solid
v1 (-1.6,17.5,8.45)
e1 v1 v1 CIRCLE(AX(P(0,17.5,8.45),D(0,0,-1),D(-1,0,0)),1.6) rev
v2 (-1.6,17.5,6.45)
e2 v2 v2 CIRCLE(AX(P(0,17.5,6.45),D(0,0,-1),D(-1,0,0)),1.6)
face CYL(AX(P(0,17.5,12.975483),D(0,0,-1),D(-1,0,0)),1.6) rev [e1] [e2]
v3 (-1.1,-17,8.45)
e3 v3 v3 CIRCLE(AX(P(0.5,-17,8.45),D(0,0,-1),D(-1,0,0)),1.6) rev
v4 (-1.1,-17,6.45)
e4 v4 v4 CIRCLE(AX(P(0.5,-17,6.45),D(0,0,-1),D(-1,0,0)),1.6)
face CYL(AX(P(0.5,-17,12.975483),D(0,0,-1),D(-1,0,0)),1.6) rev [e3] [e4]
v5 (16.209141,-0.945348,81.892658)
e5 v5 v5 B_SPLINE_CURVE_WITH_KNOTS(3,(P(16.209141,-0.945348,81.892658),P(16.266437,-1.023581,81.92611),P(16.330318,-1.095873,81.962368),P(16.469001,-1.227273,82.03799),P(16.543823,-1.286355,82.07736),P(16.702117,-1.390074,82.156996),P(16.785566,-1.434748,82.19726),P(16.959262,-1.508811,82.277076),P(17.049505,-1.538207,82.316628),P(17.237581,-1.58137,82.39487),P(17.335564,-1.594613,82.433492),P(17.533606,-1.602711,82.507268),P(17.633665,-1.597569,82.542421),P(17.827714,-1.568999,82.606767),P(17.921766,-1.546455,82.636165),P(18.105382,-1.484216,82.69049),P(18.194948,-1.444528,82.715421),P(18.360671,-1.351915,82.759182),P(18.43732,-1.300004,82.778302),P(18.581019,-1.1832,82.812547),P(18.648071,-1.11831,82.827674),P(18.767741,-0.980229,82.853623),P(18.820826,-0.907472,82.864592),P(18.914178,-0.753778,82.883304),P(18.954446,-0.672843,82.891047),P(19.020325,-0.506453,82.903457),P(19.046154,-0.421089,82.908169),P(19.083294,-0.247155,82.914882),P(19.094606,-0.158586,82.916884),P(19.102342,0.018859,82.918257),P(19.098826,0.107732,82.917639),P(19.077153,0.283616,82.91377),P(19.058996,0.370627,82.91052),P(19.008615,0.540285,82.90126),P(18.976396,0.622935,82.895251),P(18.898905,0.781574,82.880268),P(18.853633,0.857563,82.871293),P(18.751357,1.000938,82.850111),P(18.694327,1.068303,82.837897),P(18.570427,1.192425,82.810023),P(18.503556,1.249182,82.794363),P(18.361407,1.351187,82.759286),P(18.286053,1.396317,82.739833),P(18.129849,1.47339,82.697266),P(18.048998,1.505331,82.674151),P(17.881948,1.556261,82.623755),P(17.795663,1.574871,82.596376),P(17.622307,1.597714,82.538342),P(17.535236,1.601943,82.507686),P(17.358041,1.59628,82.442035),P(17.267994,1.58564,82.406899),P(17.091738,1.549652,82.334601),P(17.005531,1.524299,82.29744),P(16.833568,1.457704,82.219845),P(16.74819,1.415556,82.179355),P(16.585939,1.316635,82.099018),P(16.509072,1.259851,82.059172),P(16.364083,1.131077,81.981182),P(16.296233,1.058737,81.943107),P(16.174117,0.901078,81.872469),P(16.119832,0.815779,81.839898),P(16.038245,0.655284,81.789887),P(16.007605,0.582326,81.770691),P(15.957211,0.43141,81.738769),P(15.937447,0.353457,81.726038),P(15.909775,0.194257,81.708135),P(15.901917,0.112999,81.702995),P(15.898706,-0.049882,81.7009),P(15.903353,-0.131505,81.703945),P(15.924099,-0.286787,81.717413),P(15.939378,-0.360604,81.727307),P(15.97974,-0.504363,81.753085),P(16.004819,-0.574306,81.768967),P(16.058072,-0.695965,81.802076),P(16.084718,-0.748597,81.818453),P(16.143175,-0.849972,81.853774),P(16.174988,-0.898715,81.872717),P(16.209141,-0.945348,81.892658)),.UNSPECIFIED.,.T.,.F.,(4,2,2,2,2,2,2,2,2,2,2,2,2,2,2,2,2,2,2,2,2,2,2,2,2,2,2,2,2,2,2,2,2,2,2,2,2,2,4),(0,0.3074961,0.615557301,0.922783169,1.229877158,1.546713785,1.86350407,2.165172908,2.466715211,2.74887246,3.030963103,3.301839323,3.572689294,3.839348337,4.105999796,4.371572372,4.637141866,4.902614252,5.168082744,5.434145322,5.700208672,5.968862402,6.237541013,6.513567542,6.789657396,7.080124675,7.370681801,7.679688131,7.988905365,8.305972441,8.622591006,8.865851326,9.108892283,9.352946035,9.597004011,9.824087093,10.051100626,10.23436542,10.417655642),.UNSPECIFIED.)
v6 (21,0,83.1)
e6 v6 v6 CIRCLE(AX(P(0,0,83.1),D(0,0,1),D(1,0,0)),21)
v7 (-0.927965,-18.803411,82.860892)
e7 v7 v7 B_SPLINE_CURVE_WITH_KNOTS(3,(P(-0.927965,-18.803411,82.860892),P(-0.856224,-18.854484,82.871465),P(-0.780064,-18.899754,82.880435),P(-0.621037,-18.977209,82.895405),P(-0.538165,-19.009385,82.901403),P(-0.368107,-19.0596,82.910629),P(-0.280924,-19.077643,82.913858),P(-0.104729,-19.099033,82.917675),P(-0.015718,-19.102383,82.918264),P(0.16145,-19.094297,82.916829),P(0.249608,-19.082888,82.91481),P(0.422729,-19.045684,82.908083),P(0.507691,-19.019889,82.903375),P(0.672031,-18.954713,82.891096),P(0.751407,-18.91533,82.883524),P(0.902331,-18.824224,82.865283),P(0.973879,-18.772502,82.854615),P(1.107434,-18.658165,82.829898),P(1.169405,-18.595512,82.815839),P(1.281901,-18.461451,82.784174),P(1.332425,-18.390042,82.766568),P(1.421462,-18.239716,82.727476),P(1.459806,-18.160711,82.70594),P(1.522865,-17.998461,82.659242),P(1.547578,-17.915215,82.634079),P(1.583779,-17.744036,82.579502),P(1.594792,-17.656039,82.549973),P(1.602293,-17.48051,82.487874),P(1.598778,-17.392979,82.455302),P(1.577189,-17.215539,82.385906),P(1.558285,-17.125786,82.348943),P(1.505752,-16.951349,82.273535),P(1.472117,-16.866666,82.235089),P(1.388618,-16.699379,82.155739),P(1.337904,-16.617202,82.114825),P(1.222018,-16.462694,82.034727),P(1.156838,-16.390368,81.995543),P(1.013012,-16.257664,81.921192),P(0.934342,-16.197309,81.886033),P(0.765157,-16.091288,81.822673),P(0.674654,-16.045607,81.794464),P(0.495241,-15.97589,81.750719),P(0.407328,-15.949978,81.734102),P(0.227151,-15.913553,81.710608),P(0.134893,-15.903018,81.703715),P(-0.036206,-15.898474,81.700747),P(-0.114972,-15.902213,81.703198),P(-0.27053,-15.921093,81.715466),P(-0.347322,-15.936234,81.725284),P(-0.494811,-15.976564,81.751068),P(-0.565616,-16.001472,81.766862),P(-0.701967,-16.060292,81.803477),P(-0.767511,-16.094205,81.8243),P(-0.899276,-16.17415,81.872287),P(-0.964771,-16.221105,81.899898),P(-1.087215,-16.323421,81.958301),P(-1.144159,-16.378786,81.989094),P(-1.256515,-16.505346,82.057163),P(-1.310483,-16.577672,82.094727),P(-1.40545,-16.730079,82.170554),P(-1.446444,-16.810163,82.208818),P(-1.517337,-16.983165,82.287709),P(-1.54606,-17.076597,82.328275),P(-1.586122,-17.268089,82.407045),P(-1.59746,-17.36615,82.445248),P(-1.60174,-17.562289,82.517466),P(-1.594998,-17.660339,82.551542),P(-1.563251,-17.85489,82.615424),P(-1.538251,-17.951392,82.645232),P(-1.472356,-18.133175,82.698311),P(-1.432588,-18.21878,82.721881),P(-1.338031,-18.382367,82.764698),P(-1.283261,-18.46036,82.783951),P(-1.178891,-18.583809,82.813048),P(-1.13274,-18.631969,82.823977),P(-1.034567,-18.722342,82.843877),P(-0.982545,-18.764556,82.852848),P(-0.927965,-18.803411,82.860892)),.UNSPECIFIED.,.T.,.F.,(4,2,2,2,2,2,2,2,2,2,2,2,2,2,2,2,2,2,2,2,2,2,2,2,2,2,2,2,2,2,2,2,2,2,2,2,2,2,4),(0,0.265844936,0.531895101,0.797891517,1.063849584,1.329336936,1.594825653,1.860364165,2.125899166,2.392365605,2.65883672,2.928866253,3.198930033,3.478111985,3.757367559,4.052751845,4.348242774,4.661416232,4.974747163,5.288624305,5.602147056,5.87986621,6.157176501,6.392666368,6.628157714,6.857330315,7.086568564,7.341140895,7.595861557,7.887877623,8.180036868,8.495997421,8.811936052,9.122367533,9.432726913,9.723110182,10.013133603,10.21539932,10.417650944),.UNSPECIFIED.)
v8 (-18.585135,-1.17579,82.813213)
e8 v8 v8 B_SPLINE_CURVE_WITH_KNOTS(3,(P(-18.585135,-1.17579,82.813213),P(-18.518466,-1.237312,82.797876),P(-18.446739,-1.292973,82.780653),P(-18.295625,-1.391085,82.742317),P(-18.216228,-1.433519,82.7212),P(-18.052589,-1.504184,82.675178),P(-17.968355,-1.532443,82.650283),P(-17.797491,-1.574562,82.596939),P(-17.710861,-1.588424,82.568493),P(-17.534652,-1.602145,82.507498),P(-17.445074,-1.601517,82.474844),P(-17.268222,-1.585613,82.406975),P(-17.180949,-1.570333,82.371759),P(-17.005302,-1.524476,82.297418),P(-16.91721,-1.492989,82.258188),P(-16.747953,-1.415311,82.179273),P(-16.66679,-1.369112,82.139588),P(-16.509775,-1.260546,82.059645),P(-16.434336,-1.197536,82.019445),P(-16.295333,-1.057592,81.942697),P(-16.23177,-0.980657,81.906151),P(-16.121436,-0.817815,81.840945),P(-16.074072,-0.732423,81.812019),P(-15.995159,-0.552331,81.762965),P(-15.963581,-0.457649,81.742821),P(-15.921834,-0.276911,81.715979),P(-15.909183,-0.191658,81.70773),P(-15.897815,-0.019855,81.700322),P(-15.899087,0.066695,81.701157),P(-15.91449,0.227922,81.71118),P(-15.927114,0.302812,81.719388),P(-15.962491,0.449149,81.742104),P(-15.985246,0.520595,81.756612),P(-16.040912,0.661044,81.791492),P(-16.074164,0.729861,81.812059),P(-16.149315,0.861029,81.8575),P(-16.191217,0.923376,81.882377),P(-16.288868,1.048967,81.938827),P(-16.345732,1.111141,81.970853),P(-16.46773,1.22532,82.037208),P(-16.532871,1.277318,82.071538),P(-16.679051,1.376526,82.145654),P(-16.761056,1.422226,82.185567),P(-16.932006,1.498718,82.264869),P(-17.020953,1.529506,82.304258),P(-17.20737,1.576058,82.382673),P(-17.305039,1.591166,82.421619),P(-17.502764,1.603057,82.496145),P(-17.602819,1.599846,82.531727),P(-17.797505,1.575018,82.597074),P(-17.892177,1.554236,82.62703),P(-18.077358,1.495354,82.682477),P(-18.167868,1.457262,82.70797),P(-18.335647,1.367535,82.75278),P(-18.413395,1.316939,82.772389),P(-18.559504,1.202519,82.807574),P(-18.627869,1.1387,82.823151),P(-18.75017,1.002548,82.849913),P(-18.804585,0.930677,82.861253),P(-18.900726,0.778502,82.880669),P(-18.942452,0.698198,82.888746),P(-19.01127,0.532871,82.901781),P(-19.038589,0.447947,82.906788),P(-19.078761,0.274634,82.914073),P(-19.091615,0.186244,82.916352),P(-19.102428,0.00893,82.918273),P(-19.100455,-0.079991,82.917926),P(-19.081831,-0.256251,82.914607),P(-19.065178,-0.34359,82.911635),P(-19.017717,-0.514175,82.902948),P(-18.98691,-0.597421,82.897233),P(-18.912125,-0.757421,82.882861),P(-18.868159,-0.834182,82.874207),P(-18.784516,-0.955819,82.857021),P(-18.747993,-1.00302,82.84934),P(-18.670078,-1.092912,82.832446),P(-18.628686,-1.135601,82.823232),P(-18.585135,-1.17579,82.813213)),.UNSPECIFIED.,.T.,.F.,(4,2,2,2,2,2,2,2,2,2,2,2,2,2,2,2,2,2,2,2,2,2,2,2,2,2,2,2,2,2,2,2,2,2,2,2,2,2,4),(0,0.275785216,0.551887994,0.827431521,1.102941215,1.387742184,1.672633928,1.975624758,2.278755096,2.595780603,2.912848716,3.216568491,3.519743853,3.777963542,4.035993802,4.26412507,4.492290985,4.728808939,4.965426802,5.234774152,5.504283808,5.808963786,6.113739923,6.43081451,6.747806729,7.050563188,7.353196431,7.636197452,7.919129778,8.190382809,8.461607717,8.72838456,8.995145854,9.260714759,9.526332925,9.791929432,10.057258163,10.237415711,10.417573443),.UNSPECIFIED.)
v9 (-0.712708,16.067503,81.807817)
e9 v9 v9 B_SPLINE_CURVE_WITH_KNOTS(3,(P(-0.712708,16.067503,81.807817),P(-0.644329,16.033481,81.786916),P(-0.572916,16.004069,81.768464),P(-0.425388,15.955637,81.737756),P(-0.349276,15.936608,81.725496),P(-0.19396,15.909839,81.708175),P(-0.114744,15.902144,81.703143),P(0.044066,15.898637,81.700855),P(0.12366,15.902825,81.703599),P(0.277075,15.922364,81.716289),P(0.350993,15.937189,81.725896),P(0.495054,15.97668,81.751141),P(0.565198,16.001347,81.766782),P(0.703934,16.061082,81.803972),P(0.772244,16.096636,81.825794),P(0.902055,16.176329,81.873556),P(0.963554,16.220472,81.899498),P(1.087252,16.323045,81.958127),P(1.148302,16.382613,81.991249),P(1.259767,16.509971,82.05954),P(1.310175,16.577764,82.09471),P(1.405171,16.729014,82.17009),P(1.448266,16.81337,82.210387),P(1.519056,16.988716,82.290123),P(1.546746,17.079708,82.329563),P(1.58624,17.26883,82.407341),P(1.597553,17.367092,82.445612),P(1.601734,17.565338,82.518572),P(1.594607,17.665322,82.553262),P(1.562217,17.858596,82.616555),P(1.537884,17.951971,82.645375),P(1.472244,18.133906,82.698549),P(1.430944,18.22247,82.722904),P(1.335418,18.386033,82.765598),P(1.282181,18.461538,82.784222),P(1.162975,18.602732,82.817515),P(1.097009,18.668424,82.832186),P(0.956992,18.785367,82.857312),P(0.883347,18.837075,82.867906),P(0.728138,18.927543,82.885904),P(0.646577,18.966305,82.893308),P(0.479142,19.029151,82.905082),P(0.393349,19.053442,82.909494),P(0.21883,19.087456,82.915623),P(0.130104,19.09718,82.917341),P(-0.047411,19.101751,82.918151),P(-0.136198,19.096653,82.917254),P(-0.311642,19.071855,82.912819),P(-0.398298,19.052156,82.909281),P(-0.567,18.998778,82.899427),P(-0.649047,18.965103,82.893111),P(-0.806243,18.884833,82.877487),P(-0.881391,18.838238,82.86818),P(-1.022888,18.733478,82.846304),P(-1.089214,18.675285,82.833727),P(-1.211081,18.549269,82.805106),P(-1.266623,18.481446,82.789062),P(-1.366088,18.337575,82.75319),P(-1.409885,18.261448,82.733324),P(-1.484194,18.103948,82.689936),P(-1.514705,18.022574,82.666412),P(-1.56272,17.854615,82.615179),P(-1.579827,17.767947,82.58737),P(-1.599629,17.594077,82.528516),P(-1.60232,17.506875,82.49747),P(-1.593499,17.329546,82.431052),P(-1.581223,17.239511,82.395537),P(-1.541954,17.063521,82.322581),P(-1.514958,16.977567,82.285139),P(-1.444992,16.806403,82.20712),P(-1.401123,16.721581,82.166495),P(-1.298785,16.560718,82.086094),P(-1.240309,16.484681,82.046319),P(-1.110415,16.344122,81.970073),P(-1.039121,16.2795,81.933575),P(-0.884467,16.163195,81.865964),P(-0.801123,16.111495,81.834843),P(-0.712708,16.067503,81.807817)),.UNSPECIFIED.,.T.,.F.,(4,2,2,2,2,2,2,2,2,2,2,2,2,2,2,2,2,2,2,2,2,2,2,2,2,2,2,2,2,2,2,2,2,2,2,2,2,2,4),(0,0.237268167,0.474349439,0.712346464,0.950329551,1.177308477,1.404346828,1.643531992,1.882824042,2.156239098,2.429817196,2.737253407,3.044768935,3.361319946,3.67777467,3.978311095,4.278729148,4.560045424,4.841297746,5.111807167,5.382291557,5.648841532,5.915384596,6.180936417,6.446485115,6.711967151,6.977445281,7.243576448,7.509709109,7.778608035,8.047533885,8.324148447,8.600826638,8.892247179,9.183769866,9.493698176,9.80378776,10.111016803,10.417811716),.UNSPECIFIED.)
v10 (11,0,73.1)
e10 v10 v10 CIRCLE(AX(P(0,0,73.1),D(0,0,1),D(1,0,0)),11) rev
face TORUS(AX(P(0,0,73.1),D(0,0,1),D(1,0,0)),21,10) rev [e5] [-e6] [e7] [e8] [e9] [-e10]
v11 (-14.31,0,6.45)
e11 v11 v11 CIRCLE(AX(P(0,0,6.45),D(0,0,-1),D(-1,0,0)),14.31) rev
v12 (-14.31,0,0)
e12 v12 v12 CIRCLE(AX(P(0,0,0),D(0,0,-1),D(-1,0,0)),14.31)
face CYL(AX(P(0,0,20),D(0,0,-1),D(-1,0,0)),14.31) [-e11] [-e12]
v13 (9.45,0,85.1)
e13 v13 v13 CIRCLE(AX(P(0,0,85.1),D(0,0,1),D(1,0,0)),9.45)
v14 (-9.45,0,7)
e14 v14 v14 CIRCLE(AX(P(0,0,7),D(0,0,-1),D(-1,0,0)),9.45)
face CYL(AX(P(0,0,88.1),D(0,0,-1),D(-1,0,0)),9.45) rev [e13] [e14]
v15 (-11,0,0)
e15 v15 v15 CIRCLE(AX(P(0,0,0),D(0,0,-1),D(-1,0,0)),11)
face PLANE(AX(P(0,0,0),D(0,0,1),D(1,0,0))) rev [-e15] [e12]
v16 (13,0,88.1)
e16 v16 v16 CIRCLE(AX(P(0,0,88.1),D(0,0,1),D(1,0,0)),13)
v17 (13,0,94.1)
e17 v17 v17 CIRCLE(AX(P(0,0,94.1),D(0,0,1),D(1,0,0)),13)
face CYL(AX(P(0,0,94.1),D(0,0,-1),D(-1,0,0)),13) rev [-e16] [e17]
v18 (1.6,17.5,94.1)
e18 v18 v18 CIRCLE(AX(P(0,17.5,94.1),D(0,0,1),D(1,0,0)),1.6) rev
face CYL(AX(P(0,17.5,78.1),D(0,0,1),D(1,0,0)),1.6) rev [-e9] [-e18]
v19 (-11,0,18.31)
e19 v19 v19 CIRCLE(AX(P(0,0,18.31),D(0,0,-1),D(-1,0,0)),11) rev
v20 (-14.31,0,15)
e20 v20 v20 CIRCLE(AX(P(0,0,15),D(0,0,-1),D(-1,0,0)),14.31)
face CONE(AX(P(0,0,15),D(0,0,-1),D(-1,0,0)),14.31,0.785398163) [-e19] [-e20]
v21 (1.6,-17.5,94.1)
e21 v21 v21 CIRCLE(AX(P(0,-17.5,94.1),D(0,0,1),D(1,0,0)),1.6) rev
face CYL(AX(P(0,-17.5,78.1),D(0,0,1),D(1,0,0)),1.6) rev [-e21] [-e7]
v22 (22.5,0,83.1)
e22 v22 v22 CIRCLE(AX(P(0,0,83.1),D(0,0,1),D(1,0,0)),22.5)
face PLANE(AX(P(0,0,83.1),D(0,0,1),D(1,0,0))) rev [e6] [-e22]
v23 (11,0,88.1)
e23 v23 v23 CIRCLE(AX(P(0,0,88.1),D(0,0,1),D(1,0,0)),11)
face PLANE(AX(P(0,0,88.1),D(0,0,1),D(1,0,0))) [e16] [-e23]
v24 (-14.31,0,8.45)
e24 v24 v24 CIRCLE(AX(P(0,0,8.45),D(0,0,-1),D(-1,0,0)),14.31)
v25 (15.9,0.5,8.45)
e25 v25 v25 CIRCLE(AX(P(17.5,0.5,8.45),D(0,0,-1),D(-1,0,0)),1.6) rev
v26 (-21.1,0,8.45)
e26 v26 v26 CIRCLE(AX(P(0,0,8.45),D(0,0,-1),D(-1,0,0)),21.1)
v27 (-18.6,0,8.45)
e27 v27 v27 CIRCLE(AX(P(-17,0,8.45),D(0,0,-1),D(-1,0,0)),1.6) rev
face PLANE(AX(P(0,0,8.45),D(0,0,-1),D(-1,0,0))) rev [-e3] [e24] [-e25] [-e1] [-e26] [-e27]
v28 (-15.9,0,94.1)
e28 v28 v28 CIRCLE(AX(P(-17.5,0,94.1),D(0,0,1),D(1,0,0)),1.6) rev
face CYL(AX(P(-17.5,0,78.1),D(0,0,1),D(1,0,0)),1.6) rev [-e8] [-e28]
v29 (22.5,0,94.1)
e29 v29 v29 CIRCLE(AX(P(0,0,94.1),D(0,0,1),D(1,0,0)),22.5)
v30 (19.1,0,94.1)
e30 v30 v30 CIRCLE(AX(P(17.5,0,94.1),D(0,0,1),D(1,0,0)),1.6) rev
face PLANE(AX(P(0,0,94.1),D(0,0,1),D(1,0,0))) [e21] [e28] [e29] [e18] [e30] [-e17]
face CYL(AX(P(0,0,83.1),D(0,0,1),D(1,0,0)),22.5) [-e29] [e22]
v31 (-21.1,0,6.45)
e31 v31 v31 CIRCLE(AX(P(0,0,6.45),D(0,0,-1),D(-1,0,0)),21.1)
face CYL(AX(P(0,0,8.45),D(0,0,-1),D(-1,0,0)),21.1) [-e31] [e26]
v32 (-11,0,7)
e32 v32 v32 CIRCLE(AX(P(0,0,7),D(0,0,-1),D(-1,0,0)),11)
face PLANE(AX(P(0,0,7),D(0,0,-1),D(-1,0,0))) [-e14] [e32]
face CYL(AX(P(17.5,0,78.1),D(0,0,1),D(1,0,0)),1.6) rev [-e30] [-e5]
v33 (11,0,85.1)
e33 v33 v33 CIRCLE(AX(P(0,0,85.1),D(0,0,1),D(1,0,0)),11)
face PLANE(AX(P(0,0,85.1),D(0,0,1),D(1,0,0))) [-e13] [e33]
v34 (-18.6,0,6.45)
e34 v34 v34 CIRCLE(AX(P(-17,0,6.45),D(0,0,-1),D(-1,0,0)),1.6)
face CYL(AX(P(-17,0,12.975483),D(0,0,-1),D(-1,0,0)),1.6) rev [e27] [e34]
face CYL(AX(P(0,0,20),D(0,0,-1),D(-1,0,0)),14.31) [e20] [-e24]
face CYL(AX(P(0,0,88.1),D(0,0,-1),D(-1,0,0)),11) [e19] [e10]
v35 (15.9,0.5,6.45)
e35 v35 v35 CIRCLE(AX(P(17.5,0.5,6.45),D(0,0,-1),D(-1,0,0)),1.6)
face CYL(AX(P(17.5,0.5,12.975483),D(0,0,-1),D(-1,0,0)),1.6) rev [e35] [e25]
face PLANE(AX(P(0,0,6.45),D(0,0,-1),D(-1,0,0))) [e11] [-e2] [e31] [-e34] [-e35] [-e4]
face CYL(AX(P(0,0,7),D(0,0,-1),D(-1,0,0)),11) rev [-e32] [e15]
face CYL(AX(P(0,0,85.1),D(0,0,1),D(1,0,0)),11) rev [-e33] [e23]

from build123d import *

# Parameters (mm, degrees)
SKETCH2_R               = 11
SKETCH2_R_2             = 9.45
BOSS_EXTRUDE2_DEPTH     = 88.1
BOSS_EXTRUDE3_START     = -5
SKETCH3_R               = 22.5
SKETCH3_R_2             = 11
BOSS_EXTRUDE3_DEPTH     = 5
FILLET1_R               = 10
CUT_EXTRUDE1_START      = -3
SKETCH4_R               = 11
SKETCH4_R_2             = 9.45
CUT_EXTRUDE1_DEPTH      = 3
SKETCH7_R               = 14.31
SKETCH7_R_2             = 11
BOSS_EXTRUDE6_DEPTH     = 20
SKETCH8_R               = 11
CUT_EXTRUDE3_DEPTH      = 7
SKETCH10_R              = 21.1
SKETCH10_R_2            = 14.31
BOSS_EXTRUDE8_DEPTH     = 2
CUT_EXTRUDE4_DEPTH      = 88.631173106
CUT_EXTRUDE4_DEPTH_BACK = 2
SKETCH11_R              = 1.6
CHAMFER5_SIZE           = 5
CUT_EXTRUDE5_START      = -10
SKETCH12_R              = 1.6
CUT_EXTRUDE5_DEPTH      = 10
SKETCH13_R              = 22.5
SKETCH13_R_2            = 13
SKETCH13_R_3            = 1.6
BOSS_EXTRUDE9_DEPTH     = 6


with BuildPart() as part:
    # Sketch2 → Boss-Extrude2 (new body)
    with BuildSketch(Plane.XY):
        Circle(SKETCH2_R)
        Circle(SKETCH2_R_2, mode=Mode.SUBTRACT)
    extrude(amount=BOSS_EXTRUDE2_DEPTH)

    # Sketch3 → Boss-Extrude3 (add)
    with BuildSketch(Plane.XY.offset(88.1).offset(BOSS_EXTRUDE3_START)):
        Circle(SKETCH3_R)
        Circle(SKETCH3_R_2, mode=Mode.SUBTRACT)
    extrude(amount=BOSS_EXTRUDE3_DEPTH)

    # Fillet1
    fillet1_edges = [part.edges().sort_by_distance(p)[0] for p in [
        (-11, 0, 83.1),
    ]]
    fillet(fillet1_edges, radius=FILLET1_R)

    # Sketch4 → Cut-Extrude1 (cut)
    with BuildSketch(Plane.XY.offset(88.1).offset(CUT_EXTRUDE1_START)):
        Circle(SKETCH4_R)
        Circle(SKETCH4_R_2, mode=Mode.SUBTRACT)
    extrude(amount=CUT_EXTRUDE1_DEPTH, mode=Mode.SUBTRACT)

    # Sketch7 → Boss-Extrude6 (add)
    with BuildSketch(Plane(origin=(0, 0, 0), x_dir=(-1, 0, 0), z_dir=(0, 0, -1))):
        Circle(SKETCH7_R)
        Circle(SKETCH7_R_2, mode=Mode.SUBTRACT)
    extrude(amount=-BOSS_EXTRUDE6_DEPTH)

    # Sketch8 → Cut-Extrude3 (cut)
    with BuildSketch(Plane(origin=(0, 0, 0), x_dir=(-1, 0, 0), z_dir=(0, 0, -1))):
        Circle(SKETCH8_R)
    extrude(amount=-CUT_EXTRUDE3_DEPTH, mode=Mode.SUBTRACT)

    # Sketch10 → Boss-Extrude8 (add)
    with BuildSketch(Plane(origin=(0, 0, 6.45), x_dir=(-1, 0, 0), z_dir=(0, 0, -1))):
        Circle(SKETCH10_R)
        Circle(SKETCH10_R_2, mode=Mode.SUBTRACT)
    extrude(amount=-BOSS_EXTRUDE8_DEPTH)

    # Sketch11 → Cut-Extrude4 (cut, two sides: drawn at the far end of the back side and taken through both)
    with BuildSketch(Plane(origin=(0, 0, 6.45), x_dir=(-1, 0, 0), z_dir=(0, 0, -1)).offset(-CUT_EXTRUDE4_DEPTH_BACK)):
        with Locations((0, 17.5)):
            Circle(SKETCH11_R)
        with Locations((17, 0)):
            Circle(SKETCH11_R)
        with Locations((-0.5, -17)):
            Circle(SKETCH11_R)
        with Locations((-17.5, 0.5)):
            Circle(SKETCH11_R)
    extrude(amount=CUT_EXTRUDE4_DEPTH + CUT_EXTRUDE4_DEPTH_BACK, mode=Mode.SUBTRACT)

    # Chamfer5
    # the kernel refuses this chamfer: 5 mm, written as the material it takes off along each edge
    with BuildSketch(Plane(origin=(0, 0, 20), x_dir=(-1, 0, 0), z_dir=(0, -1, 0))) as chamfer5_piece_1_section:
        Polygon((14.31 - CHAMFER5_SIZE, 0), (14.31, CHAMFER5_SIZE), (14.31, 0), align=None)
    chamfer5_piece_1 = revolve(axis=Axis((0, 0, 20), (0, 0, -1)), mode=Mode.PRIVATE)
    chamfer5_piece_1 = chamfer5_piece_1 - Plane(origin=(0, 0, 16.654544166), x_dir=(1, 0, 0), z_dir=(0, 0, -1)) * Cylinder(11, 58, mode=Mode.PRIVATE)
    add(chamfer5_piece_1, mode=Mode.SUBTRACT)

    # Sketch12 → Cut-Extrude5 (cut)
    with BuildSketch(Plane.XY.offset(88.1).offset(CUT_EXTRUDE5_START)):
        with Locations(Location((0, 17.5, 0), (0, 0, 180))):
            Circle(SKETCH12_R)
        with Locations((17.5, 0)):
            Circle(SKETCH12_R)
        with Locations((0, -17.5)):
            Circle(SKETCH12_R)
        with Locations((-17.5, 0)):
            Circle(SKETCH12_R)
    extrude(amount=CUT_EXTRUDE5_DEPTH, mode=Mode.SUBTRACT)

    # Sketch13 → Boss-Extrude9 (add)
    with BuildSketch(Plane.XY.offset(88.1)):
        Circle(SKETCH13_R)
        Circle(SKETCH13_R_2, mode=Mode.SUBTRACT)
        with Locations((-17.5, 0)):
            Circle(SKETCH13_R_3, mode=Mode.SUBTRACT)
        with Locations((17.5, 0)):
            Circle(SKETCH13_R_3, mode=Mode.SUBTRACT)
        with Locations((0, -17.5)):
            Circle(SKETCH13_R_3, mode=Mode.SUBTRACT)
        with Locations(Location((0, 17.5, 0), (0, 0, 180))):
            Circle(SKETCH13_R_3, mode=Mode.SUBTRACT)
    extrude(amount=BOSS_EXTRUDE9_DEPTH)


solid = part.part
